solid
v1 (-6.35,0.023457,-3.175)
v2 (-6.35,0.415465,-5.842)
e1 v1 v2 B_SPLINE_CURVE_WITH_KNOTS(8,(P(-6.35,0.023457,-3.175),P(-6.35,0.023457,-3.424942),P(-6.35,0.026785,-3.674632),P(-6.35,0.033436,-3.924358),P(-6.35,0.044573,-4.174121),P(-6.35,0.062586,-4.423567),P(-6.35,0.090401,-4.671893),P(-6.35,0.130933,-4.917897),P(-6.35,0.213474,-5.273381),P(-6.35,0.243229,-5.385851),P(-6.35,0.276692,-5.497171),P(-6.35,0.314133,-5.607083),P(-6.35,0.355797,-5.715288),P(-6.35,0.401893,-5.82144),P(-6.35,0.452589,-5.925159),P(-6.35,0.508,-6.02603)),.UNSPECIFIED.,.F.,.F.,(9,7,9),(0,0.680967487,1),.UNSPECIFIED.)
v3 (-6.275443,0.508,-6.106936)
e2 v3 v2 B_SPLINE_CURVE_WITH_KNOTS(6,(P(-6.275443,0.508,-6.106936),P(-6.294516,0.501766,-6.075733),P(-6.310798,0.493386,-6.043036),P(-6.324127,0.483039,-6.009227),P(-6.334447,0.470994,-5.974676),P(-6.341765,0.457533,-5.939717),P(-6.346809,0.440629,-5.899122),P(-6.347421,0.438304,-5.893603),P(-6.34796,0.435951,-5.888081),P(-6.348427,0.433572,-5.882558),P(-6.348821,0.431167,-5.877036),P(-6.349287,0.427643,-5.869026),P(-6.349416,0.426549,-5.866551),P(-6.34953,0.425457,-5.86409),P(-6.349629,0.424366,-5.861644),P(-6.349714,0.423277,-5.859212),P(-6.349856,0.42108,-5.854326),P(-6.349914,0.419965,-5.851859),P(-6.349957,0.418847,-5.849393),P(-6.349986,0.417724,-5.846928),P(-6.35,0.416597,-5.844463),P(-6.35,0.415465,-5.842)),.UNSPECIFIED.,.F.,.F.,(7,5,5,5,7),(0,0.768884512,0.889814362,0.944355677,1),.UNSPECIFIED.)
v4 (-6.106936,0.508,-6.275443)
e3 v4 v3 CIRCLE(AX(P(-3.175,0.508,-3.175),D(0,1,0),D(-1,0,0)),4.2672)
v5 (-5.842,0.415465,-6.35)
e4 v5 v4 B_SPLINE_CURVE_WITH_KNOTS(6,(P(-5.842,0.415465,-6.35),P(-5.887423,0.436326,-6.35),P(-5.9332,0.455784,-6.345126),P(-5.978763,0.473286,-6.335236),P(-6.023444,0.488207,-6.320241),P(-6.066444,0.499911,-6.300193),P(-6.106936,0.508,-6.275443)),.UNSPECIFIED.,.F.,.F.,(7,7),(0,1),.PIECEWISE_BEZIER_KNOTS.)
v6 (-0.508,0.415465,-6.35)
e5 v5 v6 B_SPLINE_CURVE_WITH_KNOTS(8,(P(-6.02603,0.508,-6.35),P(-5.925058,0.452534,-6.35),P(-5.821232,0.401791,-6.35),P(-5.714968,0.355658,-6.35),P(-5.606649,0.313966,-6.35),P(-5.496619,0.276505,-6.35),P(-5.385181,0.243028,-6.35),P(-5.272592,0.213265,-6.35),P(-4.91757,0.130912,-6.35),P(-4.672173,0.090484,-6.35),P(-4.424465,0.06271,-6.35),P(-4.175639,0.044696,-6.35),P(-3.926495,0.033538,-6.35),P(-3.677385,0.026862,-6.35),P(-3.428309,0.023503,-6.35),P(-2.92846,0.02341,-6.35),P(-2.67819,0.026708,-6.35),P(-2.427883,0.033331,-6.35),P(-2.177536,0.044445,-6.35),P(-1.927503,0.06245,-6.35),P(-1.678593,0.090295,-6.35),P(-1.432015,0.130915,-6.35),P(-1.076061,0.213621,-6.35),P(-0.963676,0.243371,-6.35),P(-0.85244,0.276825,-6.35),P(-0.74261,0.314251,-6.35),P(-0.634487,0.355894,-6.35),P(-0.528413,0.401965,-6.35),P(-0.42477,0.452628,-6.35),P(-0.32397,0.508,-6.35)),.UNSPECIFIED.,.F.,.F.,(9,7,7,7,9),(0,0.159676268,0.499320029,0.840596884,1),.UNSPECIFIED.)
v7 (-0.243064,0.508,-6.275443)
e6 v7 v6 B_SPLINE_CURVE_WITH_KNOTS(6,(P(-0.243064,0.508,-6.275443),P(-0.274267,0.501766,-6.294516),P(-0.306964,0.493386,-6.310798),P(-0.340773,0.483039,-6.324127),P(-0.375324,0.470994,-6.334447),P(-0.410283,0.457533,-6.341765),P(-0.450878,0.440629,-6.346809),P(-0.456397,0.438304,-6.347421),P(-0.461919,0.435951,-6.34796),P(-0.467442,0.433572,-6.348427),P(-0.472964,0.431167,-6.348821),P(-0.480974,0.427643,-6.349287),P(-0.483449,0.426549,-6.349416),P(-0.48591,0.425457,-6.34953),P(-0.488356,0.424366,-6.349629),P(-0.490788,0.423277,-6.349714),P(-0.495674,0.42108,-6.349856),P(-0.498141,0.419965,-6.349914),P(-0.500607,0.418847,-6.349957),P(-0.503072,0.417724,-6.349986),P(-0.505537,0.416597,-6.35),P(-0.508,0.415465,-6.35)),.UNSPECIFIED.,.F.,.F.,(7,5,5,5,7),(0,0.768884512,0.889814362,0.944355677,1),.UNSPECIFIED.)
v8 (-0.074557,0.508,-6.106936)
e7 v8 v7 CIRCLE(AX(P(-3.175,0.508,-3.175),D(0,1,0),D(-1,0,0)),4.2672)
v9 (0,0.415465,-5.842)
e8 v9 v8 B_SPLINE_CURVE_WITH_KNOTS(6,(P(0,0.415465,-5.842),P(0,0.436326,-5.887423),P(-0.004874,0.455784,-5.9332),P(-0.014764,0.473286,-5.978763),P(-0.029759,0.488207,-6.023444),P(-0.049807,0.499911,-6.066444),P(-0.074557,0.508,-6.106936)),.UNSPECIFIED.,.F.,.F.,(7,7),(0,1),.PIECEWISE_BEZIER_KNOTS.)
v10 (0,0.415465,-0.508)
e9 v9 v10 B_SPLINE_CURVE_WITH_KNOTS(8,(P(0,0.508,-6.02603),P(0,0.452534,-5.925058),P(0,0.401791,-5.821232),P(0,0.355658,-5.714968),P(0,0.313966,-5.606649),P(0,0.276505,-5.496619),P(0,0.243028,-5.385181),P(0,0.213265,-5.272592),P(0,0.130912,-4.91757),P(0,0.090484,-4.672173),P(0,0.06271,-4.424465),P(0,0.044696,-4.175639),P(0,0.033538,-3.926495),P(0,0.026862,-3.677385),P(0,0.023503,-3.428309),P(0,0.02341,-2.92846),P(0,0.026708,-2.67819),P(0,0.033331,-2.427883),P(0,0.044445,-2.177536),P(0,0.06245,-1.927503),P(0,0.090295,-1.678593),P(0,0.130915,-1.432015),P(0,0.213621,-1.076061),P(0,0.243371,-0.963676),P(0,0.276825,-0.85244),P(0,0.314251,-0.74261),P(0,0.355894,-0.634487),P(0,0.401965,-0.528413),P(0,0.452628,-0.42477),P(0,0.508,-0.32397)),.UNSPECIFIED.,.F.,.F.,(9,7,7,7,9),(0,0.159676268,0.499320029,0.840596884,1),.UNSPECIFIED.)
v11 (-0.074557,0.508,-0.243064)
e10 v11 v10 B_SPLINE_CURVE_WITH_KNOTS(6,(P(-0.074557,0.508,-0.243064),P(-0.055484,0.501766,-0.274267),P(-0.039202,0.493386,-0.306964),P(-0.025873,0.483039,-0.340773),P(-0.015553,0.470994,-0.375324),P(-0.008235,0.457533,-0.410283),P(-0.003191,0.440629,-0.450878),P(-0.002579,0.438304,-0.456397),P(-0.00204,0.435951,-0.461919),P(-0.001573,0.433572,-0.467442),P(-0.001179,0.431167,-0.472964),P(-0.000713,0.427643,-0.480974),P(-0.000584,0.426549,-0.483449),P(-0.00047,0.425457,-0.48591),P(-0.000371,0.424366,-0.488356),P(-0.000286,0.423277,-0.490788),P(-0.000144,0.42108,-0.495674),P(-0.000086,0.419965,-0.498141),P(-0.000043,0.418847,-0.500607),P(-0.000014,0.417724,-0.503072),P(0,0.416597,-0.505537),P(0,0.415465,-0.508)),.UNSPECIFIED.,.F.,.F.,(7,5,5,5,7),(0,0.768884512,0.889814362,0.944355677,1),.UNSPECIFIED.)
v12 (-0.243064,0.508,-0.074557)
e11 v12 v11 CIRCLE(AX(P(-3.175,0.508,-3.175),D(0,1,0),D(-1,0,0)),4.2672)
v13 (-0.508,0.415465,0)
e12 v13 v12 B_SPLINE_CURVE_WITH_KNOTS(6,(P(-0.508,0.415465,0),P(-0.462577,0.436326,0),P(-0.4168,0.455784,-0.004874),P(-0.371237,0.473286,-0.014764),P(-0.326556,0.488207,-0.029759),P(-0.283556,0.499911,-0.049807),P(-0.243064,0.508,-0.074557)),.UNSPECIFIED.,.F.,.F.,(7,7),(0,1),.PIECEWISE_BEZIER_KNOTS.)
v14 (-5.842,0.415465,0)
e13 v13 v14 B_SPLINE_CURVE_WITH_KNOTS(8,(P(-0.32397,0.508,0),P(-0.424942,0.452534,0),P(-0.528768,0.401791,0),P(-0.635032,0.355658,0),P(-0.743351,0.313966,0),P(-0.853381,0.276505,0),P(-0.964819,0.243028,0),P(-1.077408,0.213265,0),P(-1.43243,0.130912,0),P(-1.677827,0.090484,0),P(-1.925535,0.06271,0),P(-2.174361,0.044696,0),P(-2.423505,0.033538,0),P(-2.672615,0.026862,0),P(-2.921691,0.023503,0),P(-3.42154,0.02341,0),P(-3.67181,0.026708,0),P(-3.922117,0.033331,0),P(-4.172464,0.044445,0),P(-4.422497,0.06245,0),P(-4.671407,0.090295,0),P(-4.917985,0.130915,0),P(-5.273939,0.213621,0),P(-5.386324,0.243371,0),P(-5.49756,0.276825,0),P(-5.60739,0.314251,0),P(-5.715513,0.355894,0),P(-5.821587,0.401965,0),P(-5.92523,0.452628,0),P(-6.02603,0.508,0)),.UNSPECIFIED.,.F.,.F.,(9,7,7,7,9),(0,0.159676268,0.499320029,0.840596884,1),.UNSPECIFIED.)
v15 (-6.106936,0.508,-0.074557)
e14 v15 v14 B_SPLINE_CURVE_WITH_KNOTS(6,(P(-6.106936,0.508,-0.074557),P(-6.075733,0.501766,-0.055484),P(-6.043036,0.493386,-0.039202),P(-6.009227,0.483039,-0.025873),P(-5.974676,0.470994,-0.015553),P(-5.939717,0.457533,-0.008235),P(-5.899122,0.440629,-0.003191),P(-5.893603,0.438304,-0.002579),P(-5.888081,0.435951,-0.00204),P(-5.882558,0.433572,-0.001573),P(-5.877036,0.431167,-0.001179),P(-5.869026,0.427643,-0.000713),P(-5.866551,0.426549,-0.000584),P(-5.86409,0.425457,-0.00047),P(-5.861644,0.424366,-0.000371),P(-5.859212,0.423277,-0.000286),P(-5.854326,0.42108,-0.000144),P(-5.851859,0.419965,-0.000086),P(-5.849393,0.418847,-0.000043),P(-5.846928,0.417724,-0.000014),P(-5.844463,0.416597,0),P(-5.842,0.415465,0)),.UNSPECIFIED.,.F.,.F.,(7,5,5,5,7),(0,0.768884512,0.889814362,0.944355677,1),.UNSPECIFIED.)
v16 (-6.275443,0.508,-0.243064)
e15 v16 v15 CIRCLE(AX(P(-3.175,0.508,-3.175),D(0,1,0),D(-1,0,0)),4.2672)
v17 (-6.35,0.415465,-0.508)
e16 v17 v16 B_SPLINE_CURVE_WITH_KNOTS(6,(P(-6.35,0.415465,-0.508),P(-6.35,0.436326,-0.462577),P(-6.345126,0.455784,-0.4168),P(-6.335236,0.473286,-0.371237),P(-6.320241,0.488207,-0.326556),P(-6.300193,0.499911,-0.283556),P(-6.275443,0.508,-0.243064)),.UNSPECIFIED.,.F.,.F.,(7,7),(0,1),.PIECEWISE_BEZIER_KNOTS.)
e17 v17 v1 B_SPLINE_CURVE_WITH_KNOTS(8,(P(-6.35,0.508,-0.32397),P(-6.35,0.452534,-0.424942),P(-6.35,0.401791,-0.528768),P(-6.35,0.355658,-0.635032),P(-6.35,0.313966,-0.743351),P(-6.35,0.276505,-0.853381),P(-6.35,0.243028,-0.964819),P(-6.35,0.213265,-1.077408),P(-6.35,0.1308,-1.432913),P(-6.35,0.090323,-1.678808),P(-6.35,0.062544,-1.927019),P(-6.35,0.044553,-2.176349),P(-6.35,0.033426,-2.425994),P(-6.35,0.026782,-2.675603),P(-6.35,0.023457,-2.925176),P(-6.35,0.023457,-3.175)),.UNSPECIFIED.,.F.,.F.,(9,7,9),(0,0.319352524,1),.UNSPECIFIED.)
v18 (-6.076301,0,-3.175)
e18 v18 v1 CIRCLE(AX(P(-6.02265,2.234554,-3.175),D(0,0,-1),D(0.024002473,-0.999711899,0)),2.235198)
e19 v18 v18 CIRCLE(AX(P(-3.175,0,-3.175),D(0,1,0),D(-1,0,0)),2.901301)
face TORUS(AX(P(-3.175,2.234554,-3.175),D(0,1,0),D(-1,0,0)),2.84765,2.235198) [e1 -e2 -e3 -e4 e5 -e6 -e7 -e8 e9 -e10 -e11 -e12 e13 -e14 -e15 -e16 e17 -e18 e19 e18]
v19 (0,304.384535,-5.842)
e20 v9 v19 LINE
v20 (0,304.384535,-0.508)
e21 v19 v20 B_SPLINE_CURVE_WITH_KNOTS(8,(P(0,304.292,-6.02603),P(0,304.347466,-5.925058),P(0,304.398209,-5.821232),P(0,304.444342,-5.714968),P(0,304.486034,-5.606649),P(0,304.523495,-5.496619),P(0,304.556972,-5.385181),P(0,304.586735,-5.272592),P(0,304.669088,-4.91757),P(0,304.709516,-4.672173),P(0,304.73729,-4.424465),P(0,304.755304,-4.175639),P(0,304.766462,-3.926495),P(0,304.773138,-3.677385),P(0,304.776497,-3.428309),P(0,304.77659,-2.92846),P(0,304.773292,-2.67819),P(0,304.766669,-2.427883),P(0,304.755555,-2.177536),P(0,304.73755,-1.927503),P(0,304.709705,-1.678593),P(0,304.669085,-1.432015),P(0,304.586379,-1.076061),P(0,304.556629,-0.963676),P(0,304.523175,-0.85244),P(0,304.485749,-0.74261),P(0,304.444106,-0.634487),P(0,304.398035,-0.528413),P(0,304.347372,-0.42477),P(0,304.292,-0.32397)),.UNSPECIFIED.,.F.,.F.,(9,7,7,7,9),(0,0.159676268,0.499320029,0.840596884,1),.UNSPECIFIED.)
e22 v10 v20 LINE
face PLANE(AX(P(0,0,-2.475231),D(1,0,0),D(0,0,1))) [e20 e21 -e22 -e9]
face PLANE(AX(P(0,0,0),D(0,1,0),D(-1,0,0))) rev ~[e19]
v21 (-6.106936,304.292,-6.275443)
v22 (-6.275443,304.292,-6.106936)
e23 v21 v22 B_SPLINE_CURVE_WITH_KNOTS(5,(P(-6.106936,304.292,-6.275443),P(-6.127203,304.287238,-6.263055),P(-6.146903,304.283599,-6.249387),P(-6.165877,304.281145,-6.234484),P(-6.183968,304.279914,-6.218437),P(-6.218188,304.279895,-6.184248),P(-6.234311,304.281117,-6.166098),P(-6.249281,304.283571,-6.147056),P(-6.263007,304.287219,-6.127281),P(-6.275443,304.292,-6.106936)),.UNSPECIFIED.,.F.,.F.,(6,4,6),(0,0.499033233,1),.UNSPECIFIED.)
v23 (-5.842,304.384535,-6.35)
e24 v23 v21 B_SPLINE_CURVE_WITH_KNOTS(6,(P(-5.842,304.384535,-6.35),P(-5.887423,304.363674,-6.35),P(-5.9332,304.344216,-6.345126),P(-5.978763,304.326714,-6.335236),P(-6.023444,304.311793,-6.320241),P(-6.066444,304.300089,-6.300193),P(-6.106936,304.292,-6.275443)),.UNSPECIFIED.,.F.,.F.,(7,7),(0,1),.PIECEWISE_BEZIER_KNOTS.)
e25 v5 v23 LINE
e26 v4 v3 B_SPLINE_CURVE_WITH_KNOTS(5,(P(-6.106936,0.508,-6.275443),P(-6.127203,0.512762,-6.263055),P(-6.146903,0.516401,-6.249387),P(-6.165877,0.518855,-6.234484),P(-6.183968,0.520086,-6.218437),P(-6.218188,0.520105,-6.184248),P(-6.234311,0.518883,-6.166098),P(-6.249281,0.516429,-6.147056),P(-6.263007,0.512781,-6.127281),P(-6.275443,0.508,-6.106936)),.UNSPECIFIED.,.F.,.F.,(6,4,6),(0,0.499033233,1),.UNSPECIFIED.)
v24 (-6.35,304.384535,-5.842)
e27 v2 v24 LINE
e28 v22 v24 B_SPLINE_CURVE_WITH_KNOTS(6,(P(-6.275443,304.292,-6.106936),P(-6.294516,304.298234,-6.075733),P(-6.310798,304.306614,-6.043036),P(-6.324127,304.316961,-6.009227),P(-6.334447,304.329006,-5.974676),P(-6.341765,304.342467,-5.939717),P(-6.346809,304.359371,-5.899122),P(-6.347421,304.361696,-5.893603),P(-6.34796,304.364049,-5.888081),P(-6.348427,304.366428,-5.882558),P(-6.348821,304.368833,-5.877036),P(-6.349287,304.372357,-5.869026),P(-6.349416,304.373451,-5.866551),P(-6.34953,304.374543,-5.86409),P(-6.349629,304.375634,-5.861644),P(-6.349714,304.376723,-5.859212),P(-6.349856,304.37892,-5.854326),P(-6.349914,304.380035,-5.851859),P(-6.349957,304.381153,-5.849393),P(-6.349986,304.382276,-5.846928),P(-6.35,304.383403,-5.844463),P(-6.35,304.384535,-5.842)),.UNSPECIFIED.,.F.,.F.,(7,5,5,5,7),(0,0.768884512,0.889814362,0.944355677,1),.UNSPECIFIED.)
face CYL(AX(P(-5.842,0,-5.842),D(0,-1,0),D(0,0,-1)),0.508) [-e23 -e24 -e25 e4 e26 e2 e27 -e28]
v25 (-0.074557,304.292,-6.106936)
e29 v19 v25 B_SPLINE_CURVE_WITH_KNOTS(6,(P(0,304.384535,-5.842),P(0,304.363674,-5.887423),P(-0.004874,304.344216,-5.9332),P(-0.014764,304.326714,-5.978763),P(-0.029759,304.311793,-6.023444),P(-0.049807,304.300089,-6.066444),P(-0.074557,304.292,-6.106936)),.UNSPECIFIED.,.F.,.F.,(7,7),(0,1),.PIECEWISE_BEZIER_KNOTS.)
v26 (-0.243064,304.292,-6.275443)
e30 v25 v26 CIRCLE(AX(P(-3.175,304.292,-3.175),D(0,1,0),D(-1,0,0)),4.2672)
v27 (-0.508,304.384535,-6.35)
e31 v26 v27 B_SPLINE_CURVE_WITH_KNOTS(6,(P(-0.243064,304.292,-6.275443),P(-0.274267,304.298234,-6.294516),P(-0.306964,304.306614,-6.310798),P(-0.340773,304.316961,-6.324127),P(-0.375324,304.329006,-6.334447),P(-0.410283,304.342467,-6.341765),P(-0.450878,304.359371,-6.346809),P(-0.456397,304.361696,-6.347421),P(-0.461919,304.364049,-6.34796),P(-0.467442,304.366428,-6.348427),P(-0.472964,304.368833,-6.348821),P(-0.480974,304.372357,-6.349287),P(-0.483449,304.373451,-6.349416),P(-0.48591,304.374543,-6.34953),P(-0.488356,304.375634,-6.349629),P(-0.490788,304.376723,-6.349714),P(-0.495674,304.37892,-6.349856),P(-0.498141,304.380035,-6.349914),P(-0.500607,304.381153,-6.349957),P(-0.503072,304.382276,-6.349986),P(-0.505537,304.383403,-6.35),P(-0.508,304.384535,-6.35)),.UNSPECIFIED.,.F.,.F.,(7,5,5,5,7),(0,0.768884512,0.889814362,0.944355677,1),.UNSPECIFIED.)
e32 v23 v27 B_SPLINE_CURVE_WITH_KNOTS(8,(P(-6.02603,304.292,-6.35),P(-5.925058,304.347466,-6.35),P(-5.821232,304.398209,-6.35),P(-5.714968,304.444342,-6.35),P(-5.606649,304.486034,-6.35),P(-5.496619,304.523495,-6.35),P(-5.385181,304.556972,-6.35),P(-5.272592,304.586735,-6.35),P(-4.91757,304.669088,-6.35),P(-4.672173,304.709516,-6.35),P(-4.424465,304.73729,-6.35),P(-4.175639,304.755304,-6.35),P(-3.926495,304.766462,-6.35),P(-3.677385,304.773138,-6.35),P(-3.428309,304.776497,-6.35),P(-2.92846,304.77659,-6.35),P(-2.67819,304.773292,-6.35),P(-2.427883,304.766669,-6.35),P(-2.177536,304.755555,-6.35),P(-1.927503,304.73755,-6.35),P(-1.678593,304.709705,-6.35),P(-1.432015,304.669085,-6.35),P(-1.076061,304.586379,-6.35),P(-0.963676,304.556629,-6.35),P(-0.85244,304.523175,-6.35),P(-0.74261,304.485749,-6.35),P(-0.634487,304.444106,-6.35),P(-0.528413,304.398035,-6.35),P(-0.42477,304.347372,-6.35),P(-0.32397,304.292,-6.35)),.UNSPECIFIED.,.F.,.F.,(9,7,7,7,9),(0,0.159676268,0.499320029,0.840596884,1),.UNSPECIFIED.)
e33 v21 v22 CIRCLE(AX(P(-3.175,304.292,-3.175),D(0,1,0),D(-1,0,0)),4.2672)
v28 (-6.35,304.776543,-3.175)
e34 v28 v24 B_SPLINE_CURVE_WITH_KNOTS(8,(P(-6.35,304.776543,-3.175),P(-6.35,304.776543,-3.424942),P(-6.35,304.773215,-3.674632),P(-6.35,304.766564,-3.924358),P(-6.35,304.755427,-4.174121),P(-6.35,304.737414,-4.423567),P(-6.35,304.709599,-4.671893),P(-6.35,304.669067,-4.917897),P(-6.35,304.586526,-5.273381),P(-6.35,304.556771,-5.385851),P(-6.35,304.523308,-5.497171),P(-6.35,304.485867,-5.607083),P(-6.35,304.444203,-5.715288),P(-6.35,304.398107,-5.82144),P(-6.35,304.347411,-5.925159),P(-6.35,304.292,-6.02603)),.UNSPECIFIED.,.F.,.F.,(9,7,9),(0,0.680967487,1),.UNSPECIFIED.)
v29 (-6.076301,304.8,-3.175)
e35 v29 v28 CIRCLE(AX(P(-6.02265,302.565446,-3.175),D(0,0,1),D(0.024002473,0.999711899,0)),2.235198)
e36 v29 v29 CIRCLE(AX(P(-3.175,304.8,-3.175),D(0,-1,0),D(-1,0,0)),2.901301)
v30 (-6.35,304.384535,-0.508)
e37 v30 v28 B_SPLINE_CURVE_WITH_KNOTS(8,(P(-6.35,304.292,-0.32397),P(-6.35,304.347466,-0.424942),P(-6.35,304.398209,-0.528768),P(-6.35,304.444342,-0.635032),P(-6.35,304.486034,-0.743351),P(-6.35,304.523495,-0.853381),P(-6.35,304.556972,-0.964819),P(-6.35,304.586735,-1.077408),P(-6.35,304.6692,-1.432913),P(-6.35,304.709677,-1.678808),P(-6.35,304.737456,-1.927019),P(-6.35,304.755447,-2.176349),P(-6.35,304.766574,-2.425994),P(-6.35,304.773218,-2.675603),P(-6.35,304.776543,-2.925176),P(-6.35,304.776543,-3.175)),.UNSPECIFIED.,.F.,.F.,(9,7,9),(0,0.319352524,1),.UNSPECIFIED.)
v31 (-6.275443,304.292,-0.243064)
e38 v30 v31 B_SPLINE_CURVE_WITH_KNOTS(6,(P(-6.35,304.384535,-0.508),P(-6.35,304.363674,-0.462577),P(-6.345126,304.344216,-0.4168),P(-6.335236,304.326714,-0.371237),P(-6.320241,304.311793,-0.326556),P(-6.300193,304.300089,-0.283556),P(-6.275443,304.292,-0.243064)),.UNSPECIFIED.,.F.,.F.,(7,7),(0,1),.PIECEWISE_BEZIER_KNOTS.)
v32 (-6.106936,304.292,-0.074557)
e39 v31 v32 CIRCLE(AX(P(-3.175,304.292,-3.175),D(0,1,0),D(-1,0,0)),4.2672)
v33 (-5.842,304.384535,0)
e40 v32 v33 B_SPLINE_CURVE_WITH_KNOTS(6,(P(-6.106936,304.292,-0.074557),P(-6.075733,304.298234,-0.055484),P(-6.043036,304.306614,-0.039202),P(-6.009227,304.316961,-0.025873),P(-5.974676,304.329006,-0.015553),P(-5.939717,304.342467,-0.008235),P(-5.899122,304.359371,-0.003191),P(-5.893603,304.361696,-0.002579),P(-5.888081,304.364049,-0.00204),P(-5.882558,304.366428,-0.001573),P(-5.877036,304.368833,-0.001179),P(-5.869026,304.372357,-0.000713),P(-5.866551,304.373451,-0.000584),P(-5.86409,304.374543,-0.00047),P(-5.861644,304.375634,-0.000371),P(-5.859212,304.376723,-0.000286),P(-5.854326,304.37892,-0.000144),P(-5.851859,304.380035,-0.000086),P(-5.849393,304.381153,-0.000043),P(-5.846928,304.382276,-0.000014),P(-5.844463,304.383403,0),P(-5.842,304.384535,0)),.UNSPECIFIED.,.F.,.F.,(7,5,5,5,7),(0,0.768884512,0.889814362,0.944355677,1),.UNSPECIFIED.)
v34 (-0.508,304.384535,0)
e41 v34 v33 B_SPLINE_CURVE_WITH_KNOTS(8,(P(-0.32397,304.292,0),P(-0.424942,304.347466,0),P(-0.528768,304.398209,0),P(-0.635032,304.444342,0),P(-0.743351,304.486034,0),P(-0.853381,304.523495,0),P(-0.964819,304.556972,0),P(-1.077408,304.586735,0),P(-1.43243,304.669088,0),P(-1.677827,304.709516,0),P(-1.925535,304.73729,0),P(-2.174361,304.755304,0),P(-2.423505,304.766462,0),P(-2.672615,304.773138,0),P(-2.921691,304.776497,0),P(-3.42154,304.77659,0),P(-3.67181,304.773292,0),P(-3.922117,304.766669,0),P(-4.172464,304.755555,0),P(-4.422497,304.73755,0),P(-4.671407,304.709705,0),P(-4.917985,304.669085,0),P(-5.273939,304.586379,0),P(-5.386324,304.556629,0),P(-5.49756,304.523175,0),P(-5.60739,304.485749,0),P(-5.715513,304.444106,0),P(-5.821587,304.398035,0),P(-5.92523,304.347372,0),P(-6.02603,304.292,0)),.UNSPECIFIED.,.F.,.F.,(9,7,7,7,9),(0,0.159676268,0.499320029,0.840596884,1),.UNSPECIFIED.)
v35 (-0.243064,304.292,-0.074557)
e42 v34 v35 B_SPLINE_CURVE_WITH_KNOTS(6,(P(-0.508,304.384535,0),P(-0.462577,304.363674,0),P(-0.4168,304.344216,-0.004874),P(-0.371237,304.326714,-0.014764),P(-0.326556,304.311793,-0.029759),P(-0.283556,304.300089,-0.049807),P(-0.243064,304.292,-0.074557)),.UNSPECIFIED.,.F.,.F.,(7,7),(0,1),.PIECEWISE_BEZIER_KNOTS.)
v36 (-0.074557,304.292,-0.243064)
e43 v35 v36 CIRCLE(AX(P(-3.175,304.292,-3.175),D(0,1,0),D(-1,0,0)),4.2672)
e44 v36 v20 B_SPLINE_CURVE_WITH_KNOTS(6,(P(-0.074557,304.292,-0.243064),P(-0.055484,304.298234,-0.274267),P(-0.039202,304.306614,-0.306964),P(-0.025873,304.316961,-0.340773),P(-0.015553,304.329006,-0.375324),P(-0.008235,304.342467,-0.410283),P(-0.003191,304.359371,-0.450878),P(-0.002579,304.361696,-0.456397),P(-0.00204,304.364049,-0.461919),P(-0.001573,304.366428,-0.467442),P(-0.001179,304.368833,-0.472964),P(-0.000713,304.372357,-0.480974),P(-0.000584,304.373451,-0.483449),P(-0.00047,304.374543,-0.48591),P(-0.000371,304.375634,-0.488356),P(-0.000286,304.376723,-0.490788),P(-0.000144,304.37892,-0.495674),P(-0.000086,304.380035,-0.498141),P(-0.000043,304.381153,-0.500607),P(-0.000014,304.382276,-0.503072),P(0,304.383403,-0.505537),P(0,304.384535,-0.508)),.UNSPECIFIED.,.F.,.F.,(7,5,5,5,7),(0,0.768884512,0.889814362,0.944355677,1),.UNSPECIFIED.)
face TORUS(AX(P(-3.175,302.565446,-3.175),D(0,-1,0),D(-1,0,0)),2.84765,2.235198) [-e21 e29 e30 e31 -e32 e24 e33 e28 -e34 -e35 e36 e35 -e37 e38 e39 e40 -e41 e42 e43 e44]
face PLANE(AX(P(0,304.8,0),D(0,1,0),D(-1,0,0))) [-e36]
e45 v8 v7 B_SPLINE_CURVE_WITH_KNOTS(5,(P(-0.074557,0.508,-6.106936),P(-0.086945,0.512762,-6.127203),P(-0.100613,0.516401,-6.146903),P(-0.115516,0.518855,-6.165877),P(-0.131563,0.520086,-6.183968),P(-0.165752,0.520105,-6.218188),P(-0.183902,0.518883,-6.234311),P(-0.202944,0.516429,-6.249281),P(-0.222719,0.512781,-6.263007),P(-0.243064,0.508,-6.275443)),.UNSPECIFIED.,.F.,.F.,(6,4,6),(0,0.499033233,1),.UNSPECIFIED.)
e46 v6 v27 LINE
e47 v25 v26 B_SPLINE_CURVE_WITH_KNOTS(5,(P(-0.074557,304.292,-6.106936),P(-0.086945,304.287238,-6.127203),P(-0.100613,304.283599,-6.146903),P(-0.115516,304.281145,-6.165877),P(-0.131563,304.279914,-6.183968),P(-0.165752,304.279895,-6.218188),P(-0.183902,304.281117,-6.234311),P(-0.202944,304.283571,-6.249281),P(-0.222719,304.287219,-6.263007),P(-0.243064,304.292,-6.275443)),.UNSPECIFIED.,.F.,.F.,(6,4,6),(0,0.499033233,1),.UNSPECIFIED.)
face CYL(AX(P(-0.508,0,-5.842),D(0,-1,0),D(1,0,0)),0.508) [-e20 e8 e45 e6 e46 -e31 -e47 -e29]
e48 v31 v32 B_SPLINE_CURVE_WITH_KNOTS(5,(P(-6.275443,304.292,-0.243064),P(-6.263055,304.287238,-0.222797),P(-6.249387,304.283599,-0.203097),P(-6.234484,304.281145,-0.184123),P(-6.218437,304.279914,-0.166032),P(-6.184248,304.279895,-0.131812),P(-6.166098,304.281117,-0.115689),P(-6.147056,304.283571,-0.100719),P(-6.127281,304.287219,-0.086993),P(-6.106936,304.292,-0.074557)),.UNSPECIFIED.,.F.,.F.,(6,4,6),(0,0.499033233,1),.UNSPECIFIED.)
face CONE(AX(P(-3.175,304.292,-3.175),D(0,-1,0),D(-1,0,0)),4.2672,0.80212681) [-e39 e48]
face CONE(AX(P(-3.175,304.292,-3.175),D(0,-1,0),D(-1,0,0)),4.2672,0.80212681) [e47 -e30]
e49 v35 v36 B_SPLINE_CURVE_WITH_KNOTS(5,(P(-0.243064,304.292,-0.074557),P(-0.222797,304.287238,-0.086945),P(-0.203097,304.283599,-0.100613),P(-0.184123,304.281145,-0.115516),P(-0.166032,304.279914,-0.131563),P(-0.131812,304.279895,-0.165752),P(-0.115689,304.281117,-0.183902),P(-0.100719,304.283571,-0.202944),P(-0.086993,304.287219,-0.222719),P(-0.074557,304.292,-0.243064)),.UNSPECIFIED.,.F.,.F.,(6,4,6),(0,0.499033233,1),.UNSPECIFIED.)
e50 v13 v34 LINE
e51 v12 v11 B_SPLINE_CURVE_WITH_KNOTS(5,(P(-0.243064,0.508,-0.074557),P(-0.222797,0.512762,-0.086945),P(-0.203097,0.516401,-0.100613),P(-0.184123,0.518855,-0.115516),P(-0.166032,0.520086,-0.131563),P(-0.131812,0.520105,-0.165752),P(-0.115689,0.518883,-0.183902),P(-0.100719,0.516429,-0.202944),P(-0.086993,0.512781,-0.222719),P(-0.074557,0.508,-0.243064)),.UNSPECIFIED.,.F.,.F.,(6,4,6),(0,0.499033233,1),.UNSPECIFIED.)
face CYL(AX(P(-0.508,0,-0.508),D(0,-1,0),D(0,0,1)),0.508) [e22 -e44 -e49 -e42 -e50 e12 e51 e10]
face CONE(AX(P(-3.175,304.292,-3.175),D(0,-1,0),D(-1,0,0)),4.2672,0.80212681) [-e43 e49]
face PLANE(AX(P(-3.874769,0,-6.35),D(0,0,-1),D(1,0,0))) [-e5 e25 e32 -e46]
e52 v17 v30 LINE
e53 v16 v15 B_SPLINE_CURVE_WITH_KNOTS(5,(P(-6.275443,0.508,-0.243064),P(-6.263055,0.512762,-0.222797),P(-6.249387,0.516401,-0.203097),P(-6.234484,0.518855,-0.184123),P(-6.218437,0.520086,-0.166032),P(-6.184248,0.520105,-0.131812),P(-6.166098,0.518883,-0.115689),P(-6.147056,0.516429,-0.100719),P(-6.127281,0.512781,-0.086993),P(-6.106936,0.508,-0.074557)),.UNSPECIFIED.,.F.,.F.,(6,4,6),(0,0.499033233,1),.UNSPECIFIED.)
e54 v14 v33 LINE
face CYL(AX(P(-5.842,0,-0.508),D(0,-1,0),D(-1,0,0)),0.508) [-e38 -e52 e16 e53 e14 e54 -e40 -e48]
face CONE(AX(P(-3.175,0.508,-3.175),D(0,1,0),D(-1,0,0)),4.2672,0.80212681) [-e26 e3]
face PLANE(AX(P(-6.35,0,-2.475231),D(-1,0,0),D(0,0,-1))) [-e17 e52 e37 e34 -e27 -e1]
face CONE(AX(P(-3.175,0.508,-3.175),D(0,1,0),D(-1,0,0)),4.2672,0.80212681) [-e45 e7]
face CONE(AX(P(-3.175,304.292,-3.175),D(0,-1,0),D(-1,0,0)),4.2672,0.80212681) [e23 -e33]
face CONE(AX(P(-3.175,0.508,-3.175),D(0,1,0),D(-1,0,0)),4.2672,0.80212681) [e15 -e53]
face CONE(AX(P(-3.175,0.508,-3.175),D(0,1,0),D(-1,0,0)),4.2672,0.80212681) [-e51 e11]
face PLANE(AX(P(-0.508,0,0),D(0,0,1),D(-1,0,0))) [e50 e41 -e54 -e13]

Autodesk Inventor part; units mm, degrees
ref_plane "YZ Plane" through (0, 0, 0) normal (1, 0, 0) x (0, 1, 0)
sketch "Sketch1" plane through (0, 0, 0) normal (0, 1, 0) x (-1, 0, 0)
  line L0 (0.508, 0) -> (5.842, 0)
  line L1 (6.35, -0.508) -> (6.35, -5.842)
  line L2 (5.842, -6.35) -> (0.508, -6.35)
  line L3 (0, -5.842) -> (0, -0.508)
  arc A0 (5.842, -6.35) -> (6.35, -5.842) centre (5.842, -5.842) ccw
  arc A1 (0, -5.842) -> (0.508, -6.35) centre (0.508, -5.842) ccw
  arc A2 (0.508, 0) -> (0, -0.508) centre (0.508, -0.508) ccw
  arc A3 (6.35, -0.508) -> (5.842, 0) centre (5.842, -0.508) ccw
  arc A4 (3.874769, -6.35) -> (6.35, -3.874769) centre (3.175, -3.175) ccw
  arc A5 (0, -3.874769) -> (2.475231, -6.35) centre (3.175, -3.175) ccw
  arc A6 (6.35, -2.475231) -> (3.874769, 0) centre (3.175, -3.175) ccw
  arc A7 (2.475231, 0) -> (0, -2.475231) centre (3.175, -3.175) ccw
  point P0 (0, 0)
  point P1 (6.35, -6.35)
  point P2 (6.35, 0)
  point P3 (0, -6.35)
  dimension "d0" = 6.35
  dimension "d1" = 6.35
  dimension "d2" = 0.508
extrude "Extrusion1" add sketch "Sketch1" along normal blind 304.8
ref_plane "Work Plane1" through (-0.508, 0, -3.175) normal (0, 0, -1) x (-1, 0, 0)
sketch "Sketch2" plane through (-0.508, 0, -3.175) normal (0, 0, -1) x (-1, 0, 0)
  line L0 (-0.508, 0) -> (-0.508, 304.8)
  line L1 (-0.508, 304.8) -> (5.842, 304.8)
  line L2 (5.842, 304.8) -> (5.842, 0)
  line L3 (5.842, 0) -> (-0.508, 0)
  line L4 (2.667, 304.8) -> (2.667, 305.5112)
  line L5 (2.667, 305.5112) -> (6.9342, 305.5112)
  line L6 (2.667, 304.8) -> (5.461, 304.8)
  arc A0 (6.9342, 304.292) -> (5.461, 304.8) centre (5.51465, 302.565444) ccw
  line L7 (6.9342, 305.5112) -> (7.192755, 305.5112)
  line L8 (7.192755, 305.5112) -> (7.192755, 304.041954)
  line L9 (7.192755, 304.041954) -> (6.9342, 304.292)
  dimension "d6" = 0.7112
  dimension "d7" = 4.2672
  dimension "d8" = 1.2192
  dimension "d9" = 2.794
  dimension "d10" = 2.2352
sketch "Sketch2 outline for Revolution1" plane through (-0.508, 0, -3.175) normal (0, 0, -1) x (-1, 0, 0)
  line L0 (2.667, 304.8) -> (5.461, 304.8)
  line L1 (2.667, 305.5112) -> (2.667, 304.8)
  line L2 (6.9342, 305.5112) -> (2.667, 305.5112)
  line L3 (7.192755, 305.5112) -> (6.9342, 305.5112)
  line L4 (7.192755, 304.041954) -> (7.192755, 305.5112)
  line L5 (6.9342, 304.292) -> (7.192755, 304.041954)
  arc A0 (5.461, 304.8) -> (6.9342, 304.292) centre (5.51465, 302.565444) cw
revolve "Revolution1" cut sketch "Sketch2 outline for Revolution1" angle 360 about axis through (-3.175, 304.8, -3.175) along (0, 1, 0)
ref_plane "Work Plane2" through (-3.175, 152.4, -3.175) normal (0, 1, 0) x (1, 0, 0)
mirror "Mirror1" about plane through (-3.175, 152.4, -3.175) normal (0, 1, 0) of "Revolution1"
properties part number "276-3524"
